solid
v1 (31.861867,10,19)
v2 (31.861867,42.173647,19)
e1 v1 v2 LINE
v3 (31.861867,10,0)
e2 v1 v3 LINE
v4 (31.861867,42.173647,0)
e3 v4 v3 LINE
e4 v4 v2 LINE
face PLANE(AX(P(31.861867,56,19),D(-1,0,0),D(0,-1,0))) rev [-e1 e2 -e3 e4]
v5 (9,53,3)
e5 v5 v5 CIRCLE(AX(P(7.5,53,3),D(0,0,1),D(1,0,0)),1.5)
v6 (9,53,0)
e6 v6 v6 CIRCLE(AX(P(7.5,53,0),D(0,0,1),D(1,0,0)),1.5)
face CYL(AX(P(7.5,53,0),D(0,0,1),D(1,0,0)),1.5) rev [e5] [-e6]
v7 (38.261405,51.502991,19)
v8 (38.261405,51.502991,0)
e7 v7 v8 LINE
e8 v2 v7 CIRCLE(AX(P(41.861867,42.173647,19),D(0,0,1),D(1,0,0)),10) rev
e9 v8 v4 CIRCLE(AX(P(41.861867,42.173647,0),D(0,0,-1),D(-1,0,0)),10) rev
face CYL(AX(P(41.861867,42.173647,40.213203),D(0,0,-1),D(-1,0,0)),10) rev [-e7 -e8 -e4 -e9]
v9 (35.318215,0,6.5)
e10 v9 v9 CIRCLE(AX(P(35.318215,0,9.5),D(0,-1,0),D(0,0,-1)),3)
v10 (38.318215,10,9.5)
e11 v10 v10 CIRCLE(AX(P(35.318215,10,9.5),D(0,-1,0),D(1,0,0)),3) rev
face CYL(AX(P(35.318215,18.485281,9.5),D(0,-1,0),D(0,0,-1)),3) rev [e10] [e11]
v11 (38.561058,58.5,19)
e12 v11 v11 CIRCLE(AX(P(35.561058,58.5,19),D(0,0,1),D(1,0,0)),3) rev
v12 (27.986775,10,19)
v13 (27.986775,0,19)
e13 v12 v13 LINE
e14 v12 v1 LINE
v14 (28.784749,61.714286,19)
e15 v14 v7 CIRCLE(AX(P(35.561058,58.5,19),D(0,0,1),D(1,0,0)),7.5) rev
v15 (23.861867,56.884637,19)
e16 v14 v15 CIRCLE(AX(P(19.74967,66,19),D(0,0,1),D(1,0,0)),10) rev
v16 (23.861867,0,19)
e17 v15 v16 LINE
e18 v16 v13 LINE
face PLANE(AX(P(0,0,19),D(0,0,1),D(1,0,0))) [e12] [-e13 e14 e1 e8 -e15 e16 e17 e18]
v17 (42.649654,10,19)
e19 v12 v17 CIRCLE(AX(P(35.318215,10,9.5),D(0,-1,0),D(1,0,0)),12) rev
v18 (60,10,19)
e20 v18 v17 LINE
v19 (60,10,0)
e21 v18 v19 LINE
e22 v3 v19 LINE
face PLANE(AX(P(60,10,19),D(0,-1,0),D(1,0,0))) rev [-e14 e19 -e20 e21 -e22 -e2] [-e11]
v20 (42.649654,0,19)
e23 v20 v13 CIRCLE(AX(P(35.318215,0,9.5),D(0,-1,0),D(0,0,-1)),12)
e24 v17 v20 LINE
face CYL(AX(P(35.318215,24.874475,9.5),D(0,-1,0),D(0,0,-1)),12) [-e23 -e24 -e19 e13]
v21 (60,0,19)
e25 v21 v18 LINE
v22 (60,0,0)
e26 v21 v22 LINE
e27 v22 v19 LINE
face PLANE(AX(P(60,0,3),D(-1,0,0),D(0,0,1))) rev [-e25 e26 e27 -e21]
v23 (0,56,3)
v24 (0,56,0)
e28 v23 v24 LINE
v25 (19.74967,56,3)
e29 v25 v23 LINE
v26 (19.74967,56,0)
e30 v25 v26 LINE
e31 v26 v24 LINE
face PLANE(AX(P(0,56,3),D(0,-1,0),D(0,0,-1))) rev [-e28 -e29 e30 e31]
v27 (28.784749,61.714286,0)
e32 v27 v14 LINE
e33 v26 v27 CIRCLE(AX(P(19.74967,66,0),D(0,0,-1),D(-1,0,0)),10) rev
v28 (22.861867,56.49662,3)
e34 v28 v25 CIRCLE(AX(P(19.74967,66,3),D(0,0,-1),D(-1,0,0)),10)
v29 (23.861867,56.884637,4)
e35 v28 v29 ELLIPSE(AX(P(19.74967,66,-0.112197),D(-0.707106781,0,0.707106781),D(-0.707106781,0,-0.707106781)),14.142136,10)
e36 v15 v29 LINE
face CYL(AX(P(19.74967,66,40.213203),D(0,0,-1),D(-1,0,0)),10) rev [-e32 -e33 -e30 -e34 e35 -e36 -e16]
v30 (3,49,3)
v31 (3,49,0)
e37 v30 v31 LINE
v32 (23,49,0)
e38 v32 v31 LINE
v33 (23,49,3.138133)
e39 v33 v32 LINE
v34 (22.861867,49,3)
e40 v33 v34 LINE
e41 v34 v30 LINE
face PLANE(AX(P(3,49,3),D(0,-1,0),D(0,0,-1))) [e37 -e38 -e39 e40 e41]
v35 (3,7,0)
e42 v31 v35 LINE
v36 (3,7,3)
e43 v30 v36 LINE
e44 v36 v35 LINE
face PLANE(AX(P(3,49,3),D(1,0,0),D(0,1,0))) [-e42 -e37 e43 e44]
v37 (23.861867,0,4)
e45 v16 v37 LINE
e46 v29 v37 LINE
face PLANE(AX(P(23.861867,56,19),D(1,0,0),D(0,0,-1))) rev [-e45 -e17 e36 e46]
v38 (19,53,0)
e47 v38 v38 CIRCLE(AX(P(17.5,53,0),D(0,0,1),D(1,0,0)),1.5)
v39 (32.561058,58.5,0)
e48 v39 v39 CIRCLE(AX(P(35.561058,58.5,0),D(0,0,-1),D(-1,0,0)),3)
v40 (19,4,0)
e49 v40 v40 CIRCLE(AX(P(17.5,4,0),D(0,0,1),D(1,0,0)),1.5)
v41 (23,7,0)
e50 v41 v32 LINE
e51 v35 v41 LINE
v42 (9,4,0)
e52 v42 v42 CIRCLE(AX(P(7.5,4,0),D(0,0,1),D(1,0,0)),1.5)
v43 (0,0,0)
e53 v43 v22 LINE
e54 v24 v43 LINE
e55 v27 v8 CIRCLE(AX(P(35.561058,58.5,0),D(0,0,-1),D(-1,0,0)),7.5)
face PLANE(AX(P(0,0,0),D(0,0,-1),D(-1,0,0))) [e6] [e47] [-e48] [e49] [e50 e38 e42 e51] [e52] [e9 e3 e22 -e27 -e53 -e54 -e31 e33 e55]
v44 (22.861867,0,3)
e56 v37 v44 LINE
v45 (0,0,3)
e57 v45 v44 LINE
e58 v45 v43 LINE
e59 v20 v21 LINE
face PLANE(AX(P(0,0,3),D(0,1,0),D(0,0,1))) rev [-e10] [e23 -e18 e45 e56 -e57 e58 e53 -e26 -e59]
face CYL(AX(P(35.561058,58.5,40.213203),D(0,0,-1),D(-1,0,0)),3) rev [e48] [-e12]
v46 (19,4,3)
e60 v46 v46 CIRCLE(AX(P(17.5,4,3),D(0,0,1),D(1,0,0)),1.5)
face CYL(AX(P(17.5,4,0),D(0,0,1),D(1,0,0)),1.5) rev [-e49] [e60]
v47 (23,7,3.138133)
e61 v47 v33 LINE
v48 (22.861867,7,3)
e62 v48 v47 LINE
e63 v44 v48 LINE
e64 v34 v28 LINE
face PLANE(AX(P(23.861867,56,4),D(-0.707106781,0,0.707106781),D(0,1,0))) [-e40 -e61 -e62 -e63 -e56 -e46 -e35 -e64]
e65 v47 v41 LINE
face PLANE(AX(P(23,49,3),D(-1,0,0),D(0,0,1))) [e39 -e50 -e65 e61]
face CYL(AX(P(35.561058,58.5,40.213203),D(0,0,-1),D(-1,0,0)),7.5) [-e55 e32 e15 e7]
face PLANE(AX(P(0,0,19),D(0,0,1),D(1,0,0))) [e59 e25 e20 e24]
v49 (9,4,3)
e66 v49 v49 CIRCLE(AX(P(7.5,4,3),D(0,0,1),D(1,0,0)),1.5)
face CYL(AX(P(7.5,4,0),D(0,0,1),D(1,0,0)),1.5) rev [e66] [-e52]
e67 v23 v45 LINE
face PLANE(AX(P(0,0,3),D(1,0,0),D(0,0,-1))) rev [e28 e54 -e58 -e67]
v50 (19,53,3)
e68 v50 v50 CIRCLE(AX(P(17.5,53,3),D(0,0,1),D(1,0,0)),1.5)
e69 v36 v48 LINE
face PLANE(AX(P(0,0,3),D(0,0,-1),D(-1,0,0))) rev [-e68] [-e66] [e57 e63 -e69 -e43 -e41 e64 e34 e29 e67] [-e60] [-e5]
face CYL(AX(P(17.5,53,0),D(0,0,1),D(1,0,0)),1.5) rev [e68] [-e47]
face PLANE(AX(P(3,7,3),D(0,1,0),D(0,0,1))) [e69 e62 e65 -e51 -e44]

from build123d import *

# Parameters (mm, degrees)
ESQUISSE1_W             = 60
ESQUISSE1_H             = 56
ESQUISSE1_W_2           = 20
ESQUISSE1_H_2           = 42
BOSS_EXTRU_1_DEPTH      = 3
ESQUISSE2_R             = 1.5
ENL_V_MAT_EXTRU_2_DEPTH = 83.127948958
BOSS_EXTRU_2_DEPTH      = 16
ESQUISSE4_W             = 28.138132954
ESQUISSE4_H             = 46
ENL_V_MAT_EXTRU_3_DEPTH = 84.618179841
ESQUISSE5_R             = 7.5
ESQUISSE5_R_2           = 3
BOSS_EXTRU_3_DEPTH      = 19
CONG_1_R                = 10
CONG_2_R                = 10
BOSS_EXTRU_4_DEPTH      = 10
ESQUISSE10_R            = 3
ENL_V_MAT_EXTRU_4_DEPTH = 10
CHANFREIN1_SIZE         = 1


with BuildPart() as part:
    # Esquisse1 → Boss.-Extru.1 (new body)
    with BuildSketch(Plane.XY):
        with Locations((30, 28)):
            Rectangle(ESQUISSE1_W, ESQUISSE1_H)
        with Locations((13, 28)):
            Rectangle(ESQUISSE1_W_2, ESQUISSE1_H_2, mode=Mode.SUBTRACT)
    extrude(amount=BOSS_EXTRU_1_DEPTH)

    # Esquisse2 → Enlèv. mat.-Extru.2 (cut, through all)
    with BuildSketch(Plane.XY.offset(3)):
        with Locations((7.5, 53)):
            Circle(ESQUISSE2_R)
        with Locations((17.5, 53)):
            Circle(ESQUISSE2_R)
        with Locations((7.5, 4)):
            Circle(ESQUISSE2_R)
        with Locations((17.5, 4)):
            Circle(ESQUISSE2_R)
    extrude(amount=-ENL_V_MAT_EXTRU_2_DEPTH, mode=Mode.SUBTRACT)

    # Esquisse3 → Boss.-Extru.2 (add)
    with BuildSketch(Plane.XY.offset(3)):
        Polygon((23.861867046, 56), (31.861867046, 56), (31.861867046, 10), (60, 10), (60, 0), (23.861867046, 0), align=None)
    extrude(amount=BOSS_EXTRU_2_DEPTH)

    # Esquisse4 → Enlèv. mat.-Extru.3 (cut, through all)
    with BuildSketch(Plane.XY.offset(3)):
        with Locations((45.930933523, 33)):
            Rectangle(ESQUISSE4_W, ESQUISSE4_H)
    extrude(amount=-ENL_V_MAT_EXTRU_3_DEPTH, mode=Mode.SUBTRACT)

    # Esquisse5 → Boss.-Extru.3 (add)
    with BuildSketch(Plane(origin=(0, 0, 0), x_dir=(-1, 0, 0), z_dir=(0, 0, -1))):
        with Locations((-35.561058301, 58.5)):
            Circle(ESQUISSE5_R)
        with Locations((-35.561058301, 58.5)):
            Circle(ESQUISSE5_R_2, mode=Mode.SUBTRACT)
    extrude(amount=-BOSS_EXTRU_3_DEPTH)

    # Congé1
    cong_1_edges = [part.edges().sort_by_distance(p)[0] for p in [
        (28.489990489, 56, 9.5),
    ]]
    fillet(cong_1_edges, radius=CONG_1_R)

    # Congé2
    cong_2_edges = [part.edges().sort_by_distance(p)[0] for p in [
        (31.861867046, 51.975738811, 9.5),
    ]]
    fillet(cong_2_edges, radius=CONG_2_R)

    # Esquisse9 → Boss.-Extru.4 (add)
    with BuildSketch(Plane.XZ):
        with BuildLine():
            Line((42.649653768, 19), (27.986775469, 19))
            ThreePointArc((27.986775469, 19), (35.318214618, 21.5), (42.649653768, 19))
        make_face()
    extrude(amount=-BOSS_EXTRU_4_DEPTH)

    # Esquisse10 → Enlèv. mat.-Extru.4 (cut)
    with BuildSketch(Plane.XZ):
        with Locations(Location((35.318214618, 9.5, 0), (0, 0, 270))):
            Circle(ESQUISSE10_R)
    extrude(amount=-ENL_V_MAT_EXTRU_4_DEPTH, mode=Mode.SUBTRACT)

    # Chanfrein1
    # the kernel refuses this chamfer: 1 mm, written as the material it adds along each edge
    with BuildSketch(Plane(origin=(23.861867046, 0, 3), x_dir=(0.027495876610585623, 0, 0.9996219169112968), z_dir=(0, 1, 0))) as chanfrein1_piece_1_section:
        Polygon((CHANFREIN1_SIZE * 0.999621916911, -CHANFREIN1_SIZE * 0.0274958766106), (-CHANFREIN1_SIZE * 0.0274958766106, -CHANFREIN1_SIZE * 0.999621916911), (0, 0), align=None)
    chanfrein1_piece_1 = extrude(amount=59.456320381, mode=Mode.PRIVATE)
    chanfrein1_piece_1 = split(chanfrein1_piece_1, bisect_by=Plane(origin=(23, 3.5, 3.33918952), z_dir=(1, 0, 0)), keep=Keep.TOP, mode=Mode.PRIVATE)
    chanfrein1_piece_1 = split(chanfrein1_piece_1, bisect_by=Plane(origin=(23.549970381, 7, 3.33918952), z_dir=(0, -1, 0)), keep=Keep.TOP, mode=Mode.PRIVATE)
    add(chanfrein1_piece_1)
    with BuildSketch(Plane(origin=(23.861867046, 0, 3), x_dir=(0.027495876610585623, 0, 0.9996219169112968), z_dir=(0, 1, 0))) as chanfrein1_piece_2_section:
        Polygon((CHANFREIN1_SIZE * 0.999621916911, -CHANFREIN1_SIZE * 0.0274958766106), (-CHANFREIN1_SIZE * 0.0274958766106, -CHANFREIN1_SIZE * 0.999621916911), (0, 0), align=None)
    chanfrein1_piece_2 = extrude(amount=59.456320381, mode=Mode.PRIVATE)
    chanfrein1_piece_2 = split(chanfrein1_piece_2, bisect_by=Plane(origin=(23, 3.5, 3.018362183), z_dir=(-1, 0, 0)), keep=Keep.TOP, mode=Mode.PRIVATE)
    chanfrein1_piece_2 = split(chanfrein1_piece_2, bisect_by=Plane(origin=(22.938869919, 7, 3.018362183), z_dir=(0, -1, 0)), keep=Keep.TOP, mode=Mode.PRIVATE)
    add(chanfrein1_piece_2)
    with BuildSketch(Plane(origin=(23.861867046, 0, 3), x_dir=(0.027495876610585623, 0, 0.9996219169112968), z_dir=(0, 1, 0))) as chanfrein1_piece_3_section:
        Polygon((CHANFREIN1_SIZE * 0.999621916911, -CHANFREIN1_SIZE * 0.0274958766106), (-CHANFREIN1_SIZE * 0.0274958766106, -CHANFREIN1_SIZE * 0.999621916911), (0, 0), align=None)
    chanfrein1_piece_3 = extrude(amount=59.456320381, mode=Mode.PRIVATE)
    chanfrein1_piece_3 = split(chanfrein1_piece_3, bisect_by=Plane(origin=(23.549970381, 49, 3.33918952), z_dir=(0, -1, 0)), keep=Keep.TOP, mode=Mode.PRIVATE)
    chanfrein1_piece_3 = split(chanfrein1_piece_3, bisect_by=Plane(origin=(23, 28, 3.33918952), z_dir=(1, 0, 0)), keep=Keep.TOP, mode=Mode.PRIVATE)
    chanfrein1_piece_3 = split(chanfrein1_piece_3, bisect_by=Plane(origin=(23.549970381, 7, 3.33918952), z_dir=(0, 1, 0)), keep=Keep.TOP, mode=Mode.PRIVATE)
    add(chanfrein1_piece_3)
    with BuildSketch(Plane(origin=(23.861867046, 0, 3), x_dir=(0.027495876610585623, 0, 0.9996219169112968), z_dir=(0, 1, 0))) as chanfrein1_piece_4_section:
        Polygon((CHANFREIN1_SIZE * 0.999621916911, -CHANFREIN1_SIZE * 0.0274958766106), (-CHANFREIN1_SIZE * 0.0274958766106, -CHANFREIN1_SIZE * 0.999621916911), (0, 0), align=None)
    chanfrein1_piece_4 = extrude(amount=59.456320381, mode=Mode.PRIVATE)
    chanfrein1_piece_4 = chanfrein1_piece_4 - Plane(origin=(19.74967, 66, 3.340715055), x_dir=(0.9035079029052511, -0.42857142857142916, 0), z_dir=(0, 0, -1)) * Cylinder(10, 123, mode=Mode.PRIVATE)
    chanfrein1_piece_4 = split(chanfrein1_piece_4, bisect_by=Plane(origin=(23.552807477, 49, 3.340715055), z_dir=(0, 1, 0)), keep=Keep.TOP, mode=Mode.PRIVATE)
    chanfrein1_piece_4 = split(chanfrein1_piece_4, bisect_by=Plane(origin=(23, 52.877415303, 3.340715055), z_dir=(1, 0, 0)), keep=Keep.TOP, mode=Mode.PRIVATE)
    add(chanfrein1_piece_4)
    with BuildSketch(Plane(origin=(23.861867046, 0, 3), x_dir=(0.027495876610585623, 0, 0.9996219169112968), z_dir=(0, 1, 0))) as chanfrein1_piece_5_section:
        Polygon((CHANFREIN1_SIZE * 0.999621916911, -CHANFREIN1_SIZE * 0.0274958766106), (-CHANFREIN1_SIZE * 0.0274958766106, -CHANFREIN1_SIZE * 0.999621916911), (0, 0), align=None)
    chanfrein1_piece_5 = extrude(amount=59.456320381, mode=Mode.PRIVATE)
    chanfrein1_piece_5 = chanfrein1_piece_5 - Plane(origin=(19.74967, 66, 3.018405741), x_dir=(0.9035079029052511, -0.42857142857142916, 0), z_dir=(0, 0, -1)) * Cylinder(10, 123, mode=Mode.PRIVATE)
    chanfrein1_piece_5 = split(chanfrein1_piece_5, bisect_by=Plane(origin=(22.938951148, 49, 3.018405741), z_dir=(0, 1, 0)), keep=Keep.TOP, mode=Mode.PRIVATE)
    chanfrein1_piece_5 = split(chanfrein1_piece_5, bisect_by=Plane(origin=(23, 52.761158893, 3.018405741), z_dir=(-1, 0, 0)), keep=Keep.TOP, mode=Mode.PRIVATE)
    add(chanfrein1_piece_5)


solid = part.part
